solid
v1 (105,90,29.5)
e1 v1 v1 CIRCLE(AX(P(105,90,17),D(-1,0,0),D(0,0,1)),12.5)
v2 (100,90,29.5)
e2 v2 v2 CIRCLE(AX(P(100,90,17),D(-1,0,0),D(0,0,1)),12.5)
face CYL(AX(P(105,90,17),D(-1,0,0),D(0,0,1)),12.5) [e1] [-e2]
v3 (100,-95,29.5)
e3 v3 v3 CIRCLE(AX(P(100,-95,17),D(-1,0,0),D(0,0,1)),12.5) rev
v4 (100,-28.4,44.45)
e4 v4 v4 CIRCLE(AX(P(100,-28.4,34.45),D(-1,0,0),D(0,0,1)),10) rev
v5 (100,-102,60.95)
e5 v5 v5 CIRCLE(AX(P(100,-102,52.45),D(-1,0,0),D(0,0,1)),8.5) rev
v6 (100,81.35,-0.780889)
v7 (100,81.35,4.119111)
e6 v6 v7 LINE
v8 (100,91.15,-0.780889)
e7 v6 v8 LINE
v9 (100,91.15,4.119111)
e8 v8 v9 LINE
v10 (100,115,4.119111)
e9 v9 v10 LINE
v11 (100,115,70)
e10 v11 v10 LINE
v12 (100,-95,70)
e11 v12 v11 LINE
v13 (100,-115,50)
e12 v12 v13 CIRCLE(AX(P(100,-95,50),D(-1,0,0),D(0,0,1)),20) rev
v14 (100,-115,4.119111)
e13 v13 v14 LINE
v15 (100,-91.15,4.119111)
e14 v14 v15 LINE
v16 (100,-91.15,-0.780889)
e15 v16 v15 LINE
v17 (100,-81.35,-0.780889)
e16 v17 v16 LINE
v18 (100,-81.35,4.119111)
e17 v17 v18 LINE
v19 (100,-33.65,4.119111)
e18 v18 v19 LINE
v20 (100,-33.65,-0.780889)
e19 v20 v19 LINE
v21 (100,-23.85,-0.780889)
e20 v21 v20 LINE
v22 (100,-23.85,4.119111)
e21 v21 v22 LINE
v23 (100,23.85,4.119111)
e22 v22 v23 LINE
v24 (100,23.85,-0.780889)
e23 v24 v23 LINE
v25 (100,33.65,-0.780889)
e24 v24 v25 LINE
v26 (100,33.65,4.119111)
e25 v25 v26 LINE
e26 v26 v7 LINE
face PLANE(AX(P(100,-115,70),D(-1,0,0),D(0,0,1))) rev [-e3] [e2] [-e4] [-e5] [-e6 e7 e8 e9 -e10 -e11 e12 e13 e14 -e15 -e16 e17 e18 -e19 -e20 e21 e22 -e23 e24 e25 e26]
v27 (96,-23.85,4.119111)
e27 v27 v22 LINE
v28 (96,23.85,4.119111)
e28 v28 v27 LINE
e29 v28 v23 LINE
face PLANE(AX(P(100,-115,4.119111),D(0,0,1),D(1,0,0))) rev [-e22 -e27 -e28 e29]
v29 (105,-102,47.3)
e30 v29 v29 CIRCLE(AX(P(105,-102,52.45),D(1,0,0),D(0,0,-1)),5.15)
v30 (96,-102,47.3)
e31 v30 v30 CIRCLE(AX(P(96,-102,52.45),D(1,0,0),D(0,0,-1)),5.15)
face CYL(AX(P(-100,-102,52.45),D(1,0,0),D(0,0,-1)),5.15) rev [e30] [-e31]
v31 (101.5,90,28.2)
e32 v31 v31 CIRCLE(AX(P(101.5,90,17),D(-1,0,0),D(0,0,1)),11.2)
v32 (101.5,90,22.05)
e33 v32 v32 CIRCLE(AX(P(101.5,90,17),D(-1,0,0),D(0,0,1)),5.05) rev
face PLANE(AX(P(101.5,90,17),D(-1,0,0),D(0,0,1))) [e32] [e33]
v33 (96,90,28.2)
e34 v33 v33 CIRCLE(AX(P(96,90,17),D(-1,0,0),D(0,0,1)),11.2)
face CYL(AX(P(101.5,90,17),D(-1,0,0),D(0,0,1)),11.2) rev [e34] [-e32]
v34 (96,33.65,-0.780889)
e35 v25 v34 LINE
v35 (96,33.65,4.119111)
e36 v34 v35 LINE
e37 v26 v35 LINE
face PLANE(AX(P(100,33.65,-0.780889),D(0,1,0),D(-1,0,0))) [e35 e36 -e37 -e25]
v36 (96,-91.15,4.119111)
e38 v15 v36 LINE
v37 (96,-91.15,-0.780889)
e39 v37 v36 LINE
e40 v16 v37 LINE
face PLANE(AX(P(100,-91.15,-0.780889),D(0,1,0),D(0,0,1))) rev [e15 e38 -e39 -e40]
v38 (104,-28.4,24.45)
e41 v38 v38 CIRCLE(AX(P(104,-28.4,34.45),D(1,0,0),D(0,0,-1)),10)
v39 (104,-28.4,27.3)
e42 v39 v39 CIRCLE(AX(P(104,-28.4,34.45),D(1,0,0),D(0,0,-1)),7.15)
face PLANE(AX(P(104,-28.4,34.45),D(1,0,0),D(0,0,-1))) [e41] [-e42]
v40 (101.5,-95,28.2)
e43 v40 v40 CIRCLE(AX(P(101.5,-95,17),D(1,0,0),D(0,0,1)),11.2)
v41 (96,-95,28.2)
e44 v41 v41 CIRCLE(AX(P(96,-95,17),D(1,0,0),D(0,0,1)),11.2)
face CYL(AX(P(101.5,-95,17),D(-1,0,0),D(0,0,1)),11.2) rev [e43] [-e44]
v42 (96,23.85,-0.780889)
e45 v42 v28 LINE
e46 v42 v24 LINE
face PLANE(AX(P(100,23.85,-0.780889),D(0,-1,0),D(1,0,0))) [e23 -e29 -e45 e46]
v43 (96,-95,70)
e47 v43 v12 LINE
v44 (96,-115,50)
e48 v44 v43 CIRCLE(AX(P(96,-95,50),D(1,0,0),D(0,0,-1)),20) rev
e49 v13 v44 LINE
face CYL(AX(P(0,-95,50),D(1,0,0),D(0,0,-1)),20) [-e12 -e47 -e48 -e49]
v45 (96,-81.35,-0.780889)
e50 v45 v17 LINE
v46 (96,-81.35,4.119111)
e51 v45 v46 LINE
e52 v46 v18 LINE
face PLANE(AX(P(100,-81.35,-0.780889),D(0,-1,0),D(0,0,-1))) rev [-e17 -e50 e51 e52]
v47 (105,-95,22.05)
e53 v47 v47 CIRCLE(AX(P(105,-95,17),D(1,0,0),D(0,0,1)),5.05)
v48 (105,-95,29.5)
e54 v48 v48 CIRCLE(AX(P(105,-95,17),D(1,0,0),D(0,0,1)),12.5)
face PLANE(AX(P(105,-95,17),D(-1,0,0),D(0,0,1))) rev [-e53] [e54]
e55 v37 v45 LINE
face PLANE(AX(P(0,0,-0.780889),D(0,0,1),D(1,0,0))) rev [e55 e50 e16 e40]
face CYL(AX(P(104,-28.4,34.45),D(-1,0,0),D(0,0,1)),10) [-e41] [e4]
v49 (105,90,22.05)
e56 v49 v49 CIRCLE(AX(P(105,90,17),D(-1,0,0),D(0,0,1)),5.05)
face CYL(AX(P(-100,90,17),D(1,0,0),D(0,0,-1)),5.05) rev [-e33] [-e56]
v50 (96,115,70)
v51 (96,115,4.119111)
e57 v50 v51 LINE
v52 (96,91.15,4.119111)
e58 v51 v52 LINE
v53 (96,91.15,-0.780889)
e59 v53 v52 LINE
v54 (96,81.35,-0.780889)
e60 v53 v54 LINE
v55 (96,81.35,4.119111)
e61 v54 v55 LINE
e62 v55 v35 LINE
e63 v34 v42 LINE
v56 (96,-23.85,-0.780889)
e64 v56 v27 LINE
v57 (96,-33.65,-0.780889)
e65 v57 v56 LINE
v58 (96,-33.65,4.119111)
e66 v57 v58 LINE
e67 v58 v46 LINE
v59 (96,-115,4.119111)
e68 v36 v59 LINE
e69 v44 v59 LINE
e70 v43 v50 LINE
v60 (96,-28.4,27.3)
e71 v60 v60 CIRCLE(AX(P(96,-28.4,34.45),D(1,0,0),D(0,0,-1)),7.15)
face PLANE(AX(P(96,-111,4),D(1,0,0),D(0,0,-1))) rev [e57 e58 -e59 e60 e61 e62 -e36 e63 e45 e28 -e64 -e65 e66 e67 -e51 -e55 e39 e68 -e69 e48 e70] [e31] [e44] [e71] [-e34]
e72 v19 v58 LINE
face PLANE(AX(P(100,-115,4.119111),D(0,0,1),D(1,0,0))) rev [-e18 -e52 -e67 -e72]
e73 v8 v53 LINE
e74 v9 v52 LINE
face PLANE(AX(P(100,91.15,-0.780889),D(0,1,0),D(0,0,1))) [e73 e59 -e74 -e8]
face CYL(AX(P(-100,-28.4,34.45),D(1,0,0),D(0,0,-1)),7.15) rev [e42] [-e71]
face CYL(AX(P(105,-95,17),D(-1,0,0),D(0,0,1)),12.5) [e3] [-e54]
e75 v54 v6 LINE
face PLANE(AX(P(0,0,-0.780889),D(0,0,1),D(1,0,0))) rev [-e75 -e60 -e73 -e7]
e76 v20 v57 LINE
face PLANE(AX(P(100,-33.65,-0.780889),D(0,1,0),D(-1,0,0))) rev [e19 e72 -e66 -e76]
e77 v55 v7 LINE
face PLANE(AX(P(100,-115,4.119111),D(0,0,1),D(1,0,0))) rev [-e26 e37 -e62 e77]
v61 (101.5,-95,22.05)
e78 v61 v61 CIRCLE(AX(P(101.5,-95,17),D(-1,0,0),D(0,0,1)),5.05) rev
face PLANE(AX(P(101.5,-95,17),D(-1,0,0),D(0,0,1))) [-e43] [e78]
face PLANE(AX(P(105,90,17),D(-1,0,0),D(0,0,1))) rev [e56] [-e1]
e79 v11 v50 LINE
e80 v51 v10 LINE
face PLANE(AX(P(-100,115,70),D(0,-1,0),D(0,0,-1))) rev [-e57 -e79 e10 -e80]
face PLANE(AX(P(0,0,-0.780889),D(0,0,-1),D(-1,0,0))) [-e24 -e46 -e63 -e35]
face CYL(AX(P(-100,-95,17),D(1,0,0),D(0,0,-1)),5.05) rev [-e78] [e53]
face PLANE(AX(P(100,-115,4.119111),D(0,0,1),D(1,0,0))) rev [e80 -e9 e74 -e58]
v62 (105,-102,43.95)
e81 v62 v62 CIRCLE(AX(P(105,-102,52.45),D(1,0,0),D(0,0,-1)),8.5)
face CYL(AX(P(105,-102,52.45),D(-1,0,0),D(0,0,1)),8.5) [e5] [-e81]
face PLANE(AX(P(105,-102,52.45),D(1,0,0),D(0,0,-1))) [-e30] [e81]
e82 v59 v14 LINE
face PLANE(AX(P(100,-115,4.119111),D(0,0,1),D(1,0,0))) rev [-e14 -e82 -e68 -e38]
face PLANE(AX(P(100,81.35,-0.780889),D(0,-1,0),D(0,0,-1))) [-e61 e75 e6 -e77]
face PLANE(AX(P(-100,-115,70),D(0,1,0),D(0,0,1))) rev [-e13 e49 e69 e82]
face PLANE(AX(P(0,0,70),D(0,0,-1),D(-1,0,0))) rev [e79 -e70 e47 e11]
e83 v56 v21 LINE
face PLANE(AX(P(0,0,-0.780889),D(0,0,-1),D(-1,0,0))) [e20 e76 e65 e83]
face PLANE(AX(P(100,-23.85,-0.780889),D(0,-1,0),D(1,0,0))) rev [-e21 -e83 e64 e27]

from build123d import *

# Parameters (mm, degrees)
SKETCH1_W            = 200
SKETCH1_H            = 230
BOSS_EXTRUDE1_DEPTH  = 70
SKETCH2_W            = 192
SKETCH2_H            = 222
CUT_EXTRUDE1_DEPTH   = 66
SKETCH4_W            = 196
SKETCH4_H            = 25
CUT_EXTRUDE3_DEPTH   = 10
SKETCH10_R           = 5
CUT_EXTRUDE8_DEPTH   = 167.075284133
SKETCH11_W           = 2
SKETCH11_H           = 10
BOSS_EXTRUDE2_DEPTH  = 20
SKETCH12_W           = 2
SKETCH12_H           = 5
CUT_EXTRUDE9_DEPTH   = 20
FILLET1_R            = 2.5
SKETCH13_W           = 2
SKETCH13_H           = 10
BOSS_EXTRUDE3_DEPTH  = 20
SKETCH14_W           = 2
SKETCH14_H           = 5
CUT_EXTRUDE10_DEPTH  = 20
FILLET2_R            = 2.5
SKETCH15_W           = 192
SKETCH15_H           = 66
CUT_EXTRUDE11_DEPTH  = 267.458251889
BOSS_EXTRUDE4_DEPTH  = 2
SKETCH18_R           = 7.15
CUT_EXTRUDE12_DEPTH  = 248.638849941
SKETCH19_R           = 5.05
CUT_EXTRUDE13_DEPTH  = 248.638849941
SKETCH20_R           = 5.05
CUT_EXTRUDE14_DEPTH  = 248.638849941
BOSS_EXTRUDE5_START  = 2
BOSS_EXTRUDE5_DEPTH  = 2
SKETCH21_W           = 20
SKETCH21_H           = 10
CUT_EXTRUDE15_DEPTH  = 248.638849941
SKETCH22_W           = 92
SKETCH22_H           = 40
CUT_EXTRUDE16_DEPTH  = 10
SKETCH24_R           = 5.15
CUT_EXTRUDE18_DEPTH  = 242.091269025
FILLET3_R            = 20
FILLET4_R            = 20
SKETCH25_W           = 200
SKETCH25_H           = 4.119110625
CUT_EXTRUDE19_DEPTH  = 261.384331326
SKETCH26_W           = 4
SKETCH26_H           = 65.880889375
CUT_EXTRUDE20_DEPTH  = 261.384331326
SKETCH27_W           = 4
SKETCH27_H           = 9.8
BOSS_EXTRUDE6_DEPTH  = 4.9
SKETCH28_W           = 4
SKETCH28_H           = 9.8
BOSS_EXTRUDE7_DEPTH  = 4.9
SKETCH29_R           = 12.5
SKETCH29_R_2         = 5.05
BOSS_EXTRUDE8_DEPTH  = 9
SKETCH30_R           = 8.5
SKETCH30_R_2         = 5.15
BOSS_EXTRUDE9_DEPTH  = 5
SKETCH32_R           = 10
SKETCH32_R_2         = 7.15
BOSS_EXTRUDE10_DEPTH = 4
SKETCH33_R           = 11.2
CUT_EXTRUDE21_DEPTH  = 5.5


with BuildPart() as part:
    # Sketch1 → Boss-Extrude1 (new body)
    with BuildSketch(Plane.XY):
        Rectangle(SKETCH1_W, SKETCH1_H)
    extrude(amount=BOSS_EXTRUDE1_DEPTH)

    # Sketch2 → Cut-Extrude1 (cut)
    with BuildSketch(Plane.XY.offset(70)):
        Rectangle(SKETCH2_W, SKETCH2_H)
    extrude(amount=-CUT_EXTRUDE1_DEPTH, mode=Mode.SUBTRACT)

    # Sketch4 → Cut-Extrude3 (cut)
    with BuildSketch(Plane.XZ.offset(115)):
        with Locations((0, 57.5)):
            Rectangle(SKETCH4_W, SKETCH4_H)
    extrude(amount=-CUT_EXTRUDE3_DEPTH, mode=Mode.SUBTRACT)

    # Sketch10 → Cut-Extrude8 (cut, through all)
    with BuildSketch(Plane.XY.offset(4)):
        with Locations((0, -11)):
            Circle(SKETCH10_R)
    extrude(amount=-CUT_EXTRUDE8_DEPTH, mode=Mode.SUBTRACT)

    # Sketch11 → Boss-Extrude2 (add)
    with BuildSketch(Plane.XY.offset(70)):
        with Locations((-99, -110)):
            Rectangle(SKETCH11_W, SKETCH11_H)
    extrude(amount=BOSS_EXTRUDE2_DEPTH)

    # Sketch12 → Cut-Extrude9 (cut)
    with BuildSketch(Plane.XY.offset(90)):
        with Locations((-99, -110)):
            Rectangle(SKETCH12_W, SKETCH12_H)
    extrude(amount=-CUT_EXTRUDE9_DEPTH, mode=Mode.SUBTRACT)

    # Fillet1
    fillet1_edges = [part.edges().sort_by_distance(p)[0] for p in [
        (-99, -112.5, 70),
        (-99, -107.5, 70),
    ]]
    fillet(fillet1_edges, radius=FILLET1_R - 0.0001)  # a hair under: the kernel refuses the full size

    # Sketch13 → Boss-Extrude3 (add)
    with BuildSketch(Plane.XY.offset(70)):
        with Locations((99, -110)):
            Rectangle(SKETCH13_W, SKETCH13_H)
    extrude(amount=BOSS_EXTRUDE3_DEPTH)

    # Sketch14 → Cut-Extrude10 (cut)
    with BuildSketch(Plane.XY.offset(90)):
        with Locations((99, -110)):
            Rectangle(SKETCH14_W, SKETCH14_H)
    extrude(amount=-CUT_EXTRUDE10_DEPTH, mode=Mode.SUBTRACT)

    # Fillet2
    fillet2_edges = [part.edges().sort_by_distance(p)[0] for p in [
        (99, -112.5, 70),
        (99, -107.5, 70),
    ]]
    fillet(fillet2_edges, radius=FILLET2_R - 0.0001)  # a hair under: the kernel refuses the full size

    # Sketch15 → Cut-Extrude11 (cut, through all)
    with BuildSketch(Plane(origin=(0, 115, 0), x_dir=(1, 0, 0), z_dir=(0, 1, 0))):
        with Locations((0, -37)):
            Rectangle(SKETCH15_W, SKETCH15_H)
    extrude(amount=-CUT_EXTRUDE11_DEPTH, mode=Mode.SUBTRACT)

    # Sketch16 → Boss-Extrude4 (add)
    with BuildSketch(Plane(origin=(-98, 0, 0), x_dir=(0, 0, -1), z_dir=(1, 0, 0))):
        with BuildLine():
            Line((-90, -107.5), (-72.5, -107.5))
            ThreePointArc((-72.5, -107.5), (-70, -110), (-72.5, -112.5))
            Line((-72.5, -112.5), (-90, -112.5))
            Line((-90, -112.5), (-90, -115))
            Line((-90, -115), (-45, -115))
            Line((-45, -115), (-45, -105))
            Line((-45, -105), (-90, -105))
            Line((-90, -105), (-90, -107.5))
        make_face()
    extrude(amount=BOSS_EXTRUDE4_DEPTH)

    # Sketch18 → Cut-Extrude12 (cut, through all)
    with BuildSketch(Plane(origin=(100, 0, 0), x_dir=(0, 0, -1), z_dir=(1, 0, 0))):
        with Locations((-34.45, -28.4)):
            Circle(SKETCH18_R)
    extrude(amount=-CUT_EXTRUDE12_DEPTH, mode=Mode.SUBTRACT)

    # Sketch19 → Cut-Extrude13 (cut, through all)
    with BuildSketch(Plane(origin=(100, 0, 0), x_dir=(0, 0, -1), z_dir=(1, 0, 0))):
        with Locations((-17, -95)):
            Circle(SKETCH19_R)
    extrude(amount=-CUT_EXTRUDE13_DEPTH, mode=Mode.SUBTRACT)

    # Sketch20 → Cut-Extrude14 (cut, through all)
    with BuildSketch(Plane(origin=(100, 0, 0), x_dir=(0, 0, -1), z_dir=(1, 0, 0))):
        with Locations((-17, 90)):
            Circle(SKETCH20_R)
    extrude(amount=-CUT_EXTRUDE14_DEPTH, mode=Mode.SUBTRACT)

    # Sketch17 → Boss-Extrude5 (add)
    with BuildSketch(Plane.ZY.offset(-98).offset(BOSS_EXTRUDE5_START)):
        with BuildLine():
            Line((90, -107.5), (72.5, -107.5))
            ThreePointArc((72.5, -107.5), (70, -110), (72.5, -112.5))
            Line((72.5, -112.5), (90, -112.5))
            Line((90, -112.5), (90, -115))
            Line((90, -115), (45, -115))
            Line((45, -115), (45, -105))
            Line((45, -105), (90, -105))
            Line((90, -105), (90, -107.5))
        make_face()
    extrude(amount=-BOSS_EXTRUDE5_DEPTH)

    # Sketch21 → Cut-Extrude15 (cut, through all)
    with BuildSketch(Plane(origin=(100, 0, 0), x_dir=(0, 0, -1), z_dir=(1, 0, 0))):
        with Locations((-80, -110)):
            Rectangle(SKETCH21_W, SKETCH21_H)
    extrude(amount=-CUT_EXTRUDE15_DEPTH, mode=Mode.SUBTRACT)

    # Sketch22 → Cut-Extrude16 (cut)
    with BuildSketch(Plane.XY.offset(4)):
        with Locations((0, 95)):
            Rectangle(SKETCH22_W, SKETCH22_H)
    extrude(amount=-CUT_EXTRUDE16_DEPTH, mode=Mode.SUBTRACT)

    # Sketch24 → Cut-Extrude18 (cut, through all)
    with BuildSketch(Plane(origin=(100, 0, 0), x_dir=(0, 0, -1), z_dir=(1, 0, 0))):
        with Locations((-52.45, -102)):
            Circle(SKETCH24_R)
    extrude(amount=-CUT_EXTRUDE18_DEPTH, mode=Mode.SUBTRACT)

    # Fillet3
    fillet3_edges = [part.edges().sort_by_distance(p)[0] for p in [
        (98, -115, 70),
    ]]
    fillet(fillet3_edges, radius=FILLET3_R)

    # Fillet4
    fillet4_edges = [part.edges().sort_by_distance(p)[0] for p in [
        (-98, -115, 70),
    ]]
    fillet(fillet4_edges, radius=FILLET4_R)

    # Sketch25 → Cut-Extrude19 (cut, through all)
    with BuildSketch(Plane(origin=(0, 115, 0), x_dir=(1, 0, 0), z_dir=(0, 1, 0))):
        with Locations((0, -2.059555313)):
            Rectangle(SKETCH25_W, SKETCH25_H)
    extrude(amount=-CUT_EXTRUDE19_DEPTH, mode=Mode.SUBTRACT)


with BuildPart() as cut_extrude19_piece_1:
    # of the separate pieces the step leaves, piece 1, a body of its own (cut_extrude19_pieces)
    add(part.part.solids().sort_by_distance((100, -115, 4.119110625))[0])

    # Sketch27 → Boss-Extrude6 (add)
    with BuildSketch(Plane(origin=(0, 0, 4.119110625), x_dir=(-1, 0, 0), z_dir=(0, 0, -1))):
        with Locations((-98, -86.25)):
            Rectangle(SKETCH27_W, SKETCH27_H)
    boss_extrude6 = extrude(amount=BOSS_EXTRUDE6_DEPTH)

    # Sketch28 → Boss-Extrude7 (add)
    with BuildSketch(Plane(origin=(0, 0, 4.119110625), x_dir=(-1, 0, 0), z_dir=(0, 0, -1))):
        with Locations((-98, -28.75)):
            Rectangle(SKETCH28_W, SKETCH28_H)
    boss_extrude7 = extrude(amount=BOSS_EXTRUDE7_DEPTH)

    # Mirror1: Boss-Extrude6, Boss-Extrude7 across plane
    add(boss_extrude6.mirror(Plane.ZX))
    add(boss_extrude7.mirror(Plane.ZX))

    # Sketch29 → Boss-Extrude8 (add)
    with BuildSketch(Plane.ZY.offset(-96)):
        with Locations((17, 90)):
            Circle(SKETCH29_R)
        with Locations(Location((17, 90, 0), (0, 0, 180))):
            Circle(SKETCH29_R_2, mode=Mode.SUBTRACT)
    boss_extrude8 = extrude(amount=-BOSS_EXTRUDE8_DEPTH)

    # Sketch30 → Boss-Extrude9 (add)
    with BuildSketch(Plane(origin=(100, 0, 0), x_dir=(0, 0, -1), z_dir=(1, 0, 0))):
        with Locations(Location((-52.45, -102, 0), (0, 0, 180))):
            Circle(SKETCH30_R)
        with Locations((-52.45, -102)):
            Circle(SKETCH30_R_2, mode=Mode.SUBTRACT)
    extrude(amount=BOSS_EXTRUDE9_DEPTH)

    # Sketch32 → Boss-Extrude10 (add)
    with BuildSketch(Plane(origin=(100, 0, 0), x_dir=(0, 0, -1), z_dir=(1, 0, 0))):
        with Locations(Location((-34.45, -28.4, 0), (0, 0, 180))):
            Circle(SKETCH32_R)
        with Locations((-34.45, -28.4)):
            Circle(SKETCH32_R_2, mode=Mode.SUBTRACT)
    extrude(amount=BOSS_EXTRUDE10_DEPTH)

    # Sketch33 → Cut-Extrude21 (cut)
    with BuildSketch(Plane.ZY.offset(-96)):
        with Locations((17, 90)):
            Circle(SKETCH33_R)
    cut_extrude21 = extrude(amount=-CUT_EXTRUDE21_DEPTH, mode=Mode.SUBTRACT)

    # Mirror2: Boss-Extrude8, Cut-Extrude21 across plane
    add(boss_extrude8.mirror(Plane.ZX.offset(-2.5)))
    add(cut_extrude21.mirror(Plane.ZX.offset(-2.5)), mode=Mode.SUBTRACT)


with BuildPart() as cut_extrude19_piece_2:
    # of the separate pieces the step leaves, piece 2, a body of its own (cut_extrude19_pieces)
    add(part.part.solids().sort_by_distance((-100, -115, 50))[0])

    # Sketch26 → Cut-Extrude20 (cut, through all)
    with BuildSketch(Plane(origin=(0, 115, 0), x_dir=(1, 0, 0), z_dir=(0, 1, 0))):
        with Locations((-98, -37.059555313)):
            Rectangle(SKETCH26_W, SKETCH26_H)
    extrude(amount=-CUT_EXTRUDE20_DEPTH, mode=Mode.SUBTRACT)


solid = cut_extrude19_piece_1.part
